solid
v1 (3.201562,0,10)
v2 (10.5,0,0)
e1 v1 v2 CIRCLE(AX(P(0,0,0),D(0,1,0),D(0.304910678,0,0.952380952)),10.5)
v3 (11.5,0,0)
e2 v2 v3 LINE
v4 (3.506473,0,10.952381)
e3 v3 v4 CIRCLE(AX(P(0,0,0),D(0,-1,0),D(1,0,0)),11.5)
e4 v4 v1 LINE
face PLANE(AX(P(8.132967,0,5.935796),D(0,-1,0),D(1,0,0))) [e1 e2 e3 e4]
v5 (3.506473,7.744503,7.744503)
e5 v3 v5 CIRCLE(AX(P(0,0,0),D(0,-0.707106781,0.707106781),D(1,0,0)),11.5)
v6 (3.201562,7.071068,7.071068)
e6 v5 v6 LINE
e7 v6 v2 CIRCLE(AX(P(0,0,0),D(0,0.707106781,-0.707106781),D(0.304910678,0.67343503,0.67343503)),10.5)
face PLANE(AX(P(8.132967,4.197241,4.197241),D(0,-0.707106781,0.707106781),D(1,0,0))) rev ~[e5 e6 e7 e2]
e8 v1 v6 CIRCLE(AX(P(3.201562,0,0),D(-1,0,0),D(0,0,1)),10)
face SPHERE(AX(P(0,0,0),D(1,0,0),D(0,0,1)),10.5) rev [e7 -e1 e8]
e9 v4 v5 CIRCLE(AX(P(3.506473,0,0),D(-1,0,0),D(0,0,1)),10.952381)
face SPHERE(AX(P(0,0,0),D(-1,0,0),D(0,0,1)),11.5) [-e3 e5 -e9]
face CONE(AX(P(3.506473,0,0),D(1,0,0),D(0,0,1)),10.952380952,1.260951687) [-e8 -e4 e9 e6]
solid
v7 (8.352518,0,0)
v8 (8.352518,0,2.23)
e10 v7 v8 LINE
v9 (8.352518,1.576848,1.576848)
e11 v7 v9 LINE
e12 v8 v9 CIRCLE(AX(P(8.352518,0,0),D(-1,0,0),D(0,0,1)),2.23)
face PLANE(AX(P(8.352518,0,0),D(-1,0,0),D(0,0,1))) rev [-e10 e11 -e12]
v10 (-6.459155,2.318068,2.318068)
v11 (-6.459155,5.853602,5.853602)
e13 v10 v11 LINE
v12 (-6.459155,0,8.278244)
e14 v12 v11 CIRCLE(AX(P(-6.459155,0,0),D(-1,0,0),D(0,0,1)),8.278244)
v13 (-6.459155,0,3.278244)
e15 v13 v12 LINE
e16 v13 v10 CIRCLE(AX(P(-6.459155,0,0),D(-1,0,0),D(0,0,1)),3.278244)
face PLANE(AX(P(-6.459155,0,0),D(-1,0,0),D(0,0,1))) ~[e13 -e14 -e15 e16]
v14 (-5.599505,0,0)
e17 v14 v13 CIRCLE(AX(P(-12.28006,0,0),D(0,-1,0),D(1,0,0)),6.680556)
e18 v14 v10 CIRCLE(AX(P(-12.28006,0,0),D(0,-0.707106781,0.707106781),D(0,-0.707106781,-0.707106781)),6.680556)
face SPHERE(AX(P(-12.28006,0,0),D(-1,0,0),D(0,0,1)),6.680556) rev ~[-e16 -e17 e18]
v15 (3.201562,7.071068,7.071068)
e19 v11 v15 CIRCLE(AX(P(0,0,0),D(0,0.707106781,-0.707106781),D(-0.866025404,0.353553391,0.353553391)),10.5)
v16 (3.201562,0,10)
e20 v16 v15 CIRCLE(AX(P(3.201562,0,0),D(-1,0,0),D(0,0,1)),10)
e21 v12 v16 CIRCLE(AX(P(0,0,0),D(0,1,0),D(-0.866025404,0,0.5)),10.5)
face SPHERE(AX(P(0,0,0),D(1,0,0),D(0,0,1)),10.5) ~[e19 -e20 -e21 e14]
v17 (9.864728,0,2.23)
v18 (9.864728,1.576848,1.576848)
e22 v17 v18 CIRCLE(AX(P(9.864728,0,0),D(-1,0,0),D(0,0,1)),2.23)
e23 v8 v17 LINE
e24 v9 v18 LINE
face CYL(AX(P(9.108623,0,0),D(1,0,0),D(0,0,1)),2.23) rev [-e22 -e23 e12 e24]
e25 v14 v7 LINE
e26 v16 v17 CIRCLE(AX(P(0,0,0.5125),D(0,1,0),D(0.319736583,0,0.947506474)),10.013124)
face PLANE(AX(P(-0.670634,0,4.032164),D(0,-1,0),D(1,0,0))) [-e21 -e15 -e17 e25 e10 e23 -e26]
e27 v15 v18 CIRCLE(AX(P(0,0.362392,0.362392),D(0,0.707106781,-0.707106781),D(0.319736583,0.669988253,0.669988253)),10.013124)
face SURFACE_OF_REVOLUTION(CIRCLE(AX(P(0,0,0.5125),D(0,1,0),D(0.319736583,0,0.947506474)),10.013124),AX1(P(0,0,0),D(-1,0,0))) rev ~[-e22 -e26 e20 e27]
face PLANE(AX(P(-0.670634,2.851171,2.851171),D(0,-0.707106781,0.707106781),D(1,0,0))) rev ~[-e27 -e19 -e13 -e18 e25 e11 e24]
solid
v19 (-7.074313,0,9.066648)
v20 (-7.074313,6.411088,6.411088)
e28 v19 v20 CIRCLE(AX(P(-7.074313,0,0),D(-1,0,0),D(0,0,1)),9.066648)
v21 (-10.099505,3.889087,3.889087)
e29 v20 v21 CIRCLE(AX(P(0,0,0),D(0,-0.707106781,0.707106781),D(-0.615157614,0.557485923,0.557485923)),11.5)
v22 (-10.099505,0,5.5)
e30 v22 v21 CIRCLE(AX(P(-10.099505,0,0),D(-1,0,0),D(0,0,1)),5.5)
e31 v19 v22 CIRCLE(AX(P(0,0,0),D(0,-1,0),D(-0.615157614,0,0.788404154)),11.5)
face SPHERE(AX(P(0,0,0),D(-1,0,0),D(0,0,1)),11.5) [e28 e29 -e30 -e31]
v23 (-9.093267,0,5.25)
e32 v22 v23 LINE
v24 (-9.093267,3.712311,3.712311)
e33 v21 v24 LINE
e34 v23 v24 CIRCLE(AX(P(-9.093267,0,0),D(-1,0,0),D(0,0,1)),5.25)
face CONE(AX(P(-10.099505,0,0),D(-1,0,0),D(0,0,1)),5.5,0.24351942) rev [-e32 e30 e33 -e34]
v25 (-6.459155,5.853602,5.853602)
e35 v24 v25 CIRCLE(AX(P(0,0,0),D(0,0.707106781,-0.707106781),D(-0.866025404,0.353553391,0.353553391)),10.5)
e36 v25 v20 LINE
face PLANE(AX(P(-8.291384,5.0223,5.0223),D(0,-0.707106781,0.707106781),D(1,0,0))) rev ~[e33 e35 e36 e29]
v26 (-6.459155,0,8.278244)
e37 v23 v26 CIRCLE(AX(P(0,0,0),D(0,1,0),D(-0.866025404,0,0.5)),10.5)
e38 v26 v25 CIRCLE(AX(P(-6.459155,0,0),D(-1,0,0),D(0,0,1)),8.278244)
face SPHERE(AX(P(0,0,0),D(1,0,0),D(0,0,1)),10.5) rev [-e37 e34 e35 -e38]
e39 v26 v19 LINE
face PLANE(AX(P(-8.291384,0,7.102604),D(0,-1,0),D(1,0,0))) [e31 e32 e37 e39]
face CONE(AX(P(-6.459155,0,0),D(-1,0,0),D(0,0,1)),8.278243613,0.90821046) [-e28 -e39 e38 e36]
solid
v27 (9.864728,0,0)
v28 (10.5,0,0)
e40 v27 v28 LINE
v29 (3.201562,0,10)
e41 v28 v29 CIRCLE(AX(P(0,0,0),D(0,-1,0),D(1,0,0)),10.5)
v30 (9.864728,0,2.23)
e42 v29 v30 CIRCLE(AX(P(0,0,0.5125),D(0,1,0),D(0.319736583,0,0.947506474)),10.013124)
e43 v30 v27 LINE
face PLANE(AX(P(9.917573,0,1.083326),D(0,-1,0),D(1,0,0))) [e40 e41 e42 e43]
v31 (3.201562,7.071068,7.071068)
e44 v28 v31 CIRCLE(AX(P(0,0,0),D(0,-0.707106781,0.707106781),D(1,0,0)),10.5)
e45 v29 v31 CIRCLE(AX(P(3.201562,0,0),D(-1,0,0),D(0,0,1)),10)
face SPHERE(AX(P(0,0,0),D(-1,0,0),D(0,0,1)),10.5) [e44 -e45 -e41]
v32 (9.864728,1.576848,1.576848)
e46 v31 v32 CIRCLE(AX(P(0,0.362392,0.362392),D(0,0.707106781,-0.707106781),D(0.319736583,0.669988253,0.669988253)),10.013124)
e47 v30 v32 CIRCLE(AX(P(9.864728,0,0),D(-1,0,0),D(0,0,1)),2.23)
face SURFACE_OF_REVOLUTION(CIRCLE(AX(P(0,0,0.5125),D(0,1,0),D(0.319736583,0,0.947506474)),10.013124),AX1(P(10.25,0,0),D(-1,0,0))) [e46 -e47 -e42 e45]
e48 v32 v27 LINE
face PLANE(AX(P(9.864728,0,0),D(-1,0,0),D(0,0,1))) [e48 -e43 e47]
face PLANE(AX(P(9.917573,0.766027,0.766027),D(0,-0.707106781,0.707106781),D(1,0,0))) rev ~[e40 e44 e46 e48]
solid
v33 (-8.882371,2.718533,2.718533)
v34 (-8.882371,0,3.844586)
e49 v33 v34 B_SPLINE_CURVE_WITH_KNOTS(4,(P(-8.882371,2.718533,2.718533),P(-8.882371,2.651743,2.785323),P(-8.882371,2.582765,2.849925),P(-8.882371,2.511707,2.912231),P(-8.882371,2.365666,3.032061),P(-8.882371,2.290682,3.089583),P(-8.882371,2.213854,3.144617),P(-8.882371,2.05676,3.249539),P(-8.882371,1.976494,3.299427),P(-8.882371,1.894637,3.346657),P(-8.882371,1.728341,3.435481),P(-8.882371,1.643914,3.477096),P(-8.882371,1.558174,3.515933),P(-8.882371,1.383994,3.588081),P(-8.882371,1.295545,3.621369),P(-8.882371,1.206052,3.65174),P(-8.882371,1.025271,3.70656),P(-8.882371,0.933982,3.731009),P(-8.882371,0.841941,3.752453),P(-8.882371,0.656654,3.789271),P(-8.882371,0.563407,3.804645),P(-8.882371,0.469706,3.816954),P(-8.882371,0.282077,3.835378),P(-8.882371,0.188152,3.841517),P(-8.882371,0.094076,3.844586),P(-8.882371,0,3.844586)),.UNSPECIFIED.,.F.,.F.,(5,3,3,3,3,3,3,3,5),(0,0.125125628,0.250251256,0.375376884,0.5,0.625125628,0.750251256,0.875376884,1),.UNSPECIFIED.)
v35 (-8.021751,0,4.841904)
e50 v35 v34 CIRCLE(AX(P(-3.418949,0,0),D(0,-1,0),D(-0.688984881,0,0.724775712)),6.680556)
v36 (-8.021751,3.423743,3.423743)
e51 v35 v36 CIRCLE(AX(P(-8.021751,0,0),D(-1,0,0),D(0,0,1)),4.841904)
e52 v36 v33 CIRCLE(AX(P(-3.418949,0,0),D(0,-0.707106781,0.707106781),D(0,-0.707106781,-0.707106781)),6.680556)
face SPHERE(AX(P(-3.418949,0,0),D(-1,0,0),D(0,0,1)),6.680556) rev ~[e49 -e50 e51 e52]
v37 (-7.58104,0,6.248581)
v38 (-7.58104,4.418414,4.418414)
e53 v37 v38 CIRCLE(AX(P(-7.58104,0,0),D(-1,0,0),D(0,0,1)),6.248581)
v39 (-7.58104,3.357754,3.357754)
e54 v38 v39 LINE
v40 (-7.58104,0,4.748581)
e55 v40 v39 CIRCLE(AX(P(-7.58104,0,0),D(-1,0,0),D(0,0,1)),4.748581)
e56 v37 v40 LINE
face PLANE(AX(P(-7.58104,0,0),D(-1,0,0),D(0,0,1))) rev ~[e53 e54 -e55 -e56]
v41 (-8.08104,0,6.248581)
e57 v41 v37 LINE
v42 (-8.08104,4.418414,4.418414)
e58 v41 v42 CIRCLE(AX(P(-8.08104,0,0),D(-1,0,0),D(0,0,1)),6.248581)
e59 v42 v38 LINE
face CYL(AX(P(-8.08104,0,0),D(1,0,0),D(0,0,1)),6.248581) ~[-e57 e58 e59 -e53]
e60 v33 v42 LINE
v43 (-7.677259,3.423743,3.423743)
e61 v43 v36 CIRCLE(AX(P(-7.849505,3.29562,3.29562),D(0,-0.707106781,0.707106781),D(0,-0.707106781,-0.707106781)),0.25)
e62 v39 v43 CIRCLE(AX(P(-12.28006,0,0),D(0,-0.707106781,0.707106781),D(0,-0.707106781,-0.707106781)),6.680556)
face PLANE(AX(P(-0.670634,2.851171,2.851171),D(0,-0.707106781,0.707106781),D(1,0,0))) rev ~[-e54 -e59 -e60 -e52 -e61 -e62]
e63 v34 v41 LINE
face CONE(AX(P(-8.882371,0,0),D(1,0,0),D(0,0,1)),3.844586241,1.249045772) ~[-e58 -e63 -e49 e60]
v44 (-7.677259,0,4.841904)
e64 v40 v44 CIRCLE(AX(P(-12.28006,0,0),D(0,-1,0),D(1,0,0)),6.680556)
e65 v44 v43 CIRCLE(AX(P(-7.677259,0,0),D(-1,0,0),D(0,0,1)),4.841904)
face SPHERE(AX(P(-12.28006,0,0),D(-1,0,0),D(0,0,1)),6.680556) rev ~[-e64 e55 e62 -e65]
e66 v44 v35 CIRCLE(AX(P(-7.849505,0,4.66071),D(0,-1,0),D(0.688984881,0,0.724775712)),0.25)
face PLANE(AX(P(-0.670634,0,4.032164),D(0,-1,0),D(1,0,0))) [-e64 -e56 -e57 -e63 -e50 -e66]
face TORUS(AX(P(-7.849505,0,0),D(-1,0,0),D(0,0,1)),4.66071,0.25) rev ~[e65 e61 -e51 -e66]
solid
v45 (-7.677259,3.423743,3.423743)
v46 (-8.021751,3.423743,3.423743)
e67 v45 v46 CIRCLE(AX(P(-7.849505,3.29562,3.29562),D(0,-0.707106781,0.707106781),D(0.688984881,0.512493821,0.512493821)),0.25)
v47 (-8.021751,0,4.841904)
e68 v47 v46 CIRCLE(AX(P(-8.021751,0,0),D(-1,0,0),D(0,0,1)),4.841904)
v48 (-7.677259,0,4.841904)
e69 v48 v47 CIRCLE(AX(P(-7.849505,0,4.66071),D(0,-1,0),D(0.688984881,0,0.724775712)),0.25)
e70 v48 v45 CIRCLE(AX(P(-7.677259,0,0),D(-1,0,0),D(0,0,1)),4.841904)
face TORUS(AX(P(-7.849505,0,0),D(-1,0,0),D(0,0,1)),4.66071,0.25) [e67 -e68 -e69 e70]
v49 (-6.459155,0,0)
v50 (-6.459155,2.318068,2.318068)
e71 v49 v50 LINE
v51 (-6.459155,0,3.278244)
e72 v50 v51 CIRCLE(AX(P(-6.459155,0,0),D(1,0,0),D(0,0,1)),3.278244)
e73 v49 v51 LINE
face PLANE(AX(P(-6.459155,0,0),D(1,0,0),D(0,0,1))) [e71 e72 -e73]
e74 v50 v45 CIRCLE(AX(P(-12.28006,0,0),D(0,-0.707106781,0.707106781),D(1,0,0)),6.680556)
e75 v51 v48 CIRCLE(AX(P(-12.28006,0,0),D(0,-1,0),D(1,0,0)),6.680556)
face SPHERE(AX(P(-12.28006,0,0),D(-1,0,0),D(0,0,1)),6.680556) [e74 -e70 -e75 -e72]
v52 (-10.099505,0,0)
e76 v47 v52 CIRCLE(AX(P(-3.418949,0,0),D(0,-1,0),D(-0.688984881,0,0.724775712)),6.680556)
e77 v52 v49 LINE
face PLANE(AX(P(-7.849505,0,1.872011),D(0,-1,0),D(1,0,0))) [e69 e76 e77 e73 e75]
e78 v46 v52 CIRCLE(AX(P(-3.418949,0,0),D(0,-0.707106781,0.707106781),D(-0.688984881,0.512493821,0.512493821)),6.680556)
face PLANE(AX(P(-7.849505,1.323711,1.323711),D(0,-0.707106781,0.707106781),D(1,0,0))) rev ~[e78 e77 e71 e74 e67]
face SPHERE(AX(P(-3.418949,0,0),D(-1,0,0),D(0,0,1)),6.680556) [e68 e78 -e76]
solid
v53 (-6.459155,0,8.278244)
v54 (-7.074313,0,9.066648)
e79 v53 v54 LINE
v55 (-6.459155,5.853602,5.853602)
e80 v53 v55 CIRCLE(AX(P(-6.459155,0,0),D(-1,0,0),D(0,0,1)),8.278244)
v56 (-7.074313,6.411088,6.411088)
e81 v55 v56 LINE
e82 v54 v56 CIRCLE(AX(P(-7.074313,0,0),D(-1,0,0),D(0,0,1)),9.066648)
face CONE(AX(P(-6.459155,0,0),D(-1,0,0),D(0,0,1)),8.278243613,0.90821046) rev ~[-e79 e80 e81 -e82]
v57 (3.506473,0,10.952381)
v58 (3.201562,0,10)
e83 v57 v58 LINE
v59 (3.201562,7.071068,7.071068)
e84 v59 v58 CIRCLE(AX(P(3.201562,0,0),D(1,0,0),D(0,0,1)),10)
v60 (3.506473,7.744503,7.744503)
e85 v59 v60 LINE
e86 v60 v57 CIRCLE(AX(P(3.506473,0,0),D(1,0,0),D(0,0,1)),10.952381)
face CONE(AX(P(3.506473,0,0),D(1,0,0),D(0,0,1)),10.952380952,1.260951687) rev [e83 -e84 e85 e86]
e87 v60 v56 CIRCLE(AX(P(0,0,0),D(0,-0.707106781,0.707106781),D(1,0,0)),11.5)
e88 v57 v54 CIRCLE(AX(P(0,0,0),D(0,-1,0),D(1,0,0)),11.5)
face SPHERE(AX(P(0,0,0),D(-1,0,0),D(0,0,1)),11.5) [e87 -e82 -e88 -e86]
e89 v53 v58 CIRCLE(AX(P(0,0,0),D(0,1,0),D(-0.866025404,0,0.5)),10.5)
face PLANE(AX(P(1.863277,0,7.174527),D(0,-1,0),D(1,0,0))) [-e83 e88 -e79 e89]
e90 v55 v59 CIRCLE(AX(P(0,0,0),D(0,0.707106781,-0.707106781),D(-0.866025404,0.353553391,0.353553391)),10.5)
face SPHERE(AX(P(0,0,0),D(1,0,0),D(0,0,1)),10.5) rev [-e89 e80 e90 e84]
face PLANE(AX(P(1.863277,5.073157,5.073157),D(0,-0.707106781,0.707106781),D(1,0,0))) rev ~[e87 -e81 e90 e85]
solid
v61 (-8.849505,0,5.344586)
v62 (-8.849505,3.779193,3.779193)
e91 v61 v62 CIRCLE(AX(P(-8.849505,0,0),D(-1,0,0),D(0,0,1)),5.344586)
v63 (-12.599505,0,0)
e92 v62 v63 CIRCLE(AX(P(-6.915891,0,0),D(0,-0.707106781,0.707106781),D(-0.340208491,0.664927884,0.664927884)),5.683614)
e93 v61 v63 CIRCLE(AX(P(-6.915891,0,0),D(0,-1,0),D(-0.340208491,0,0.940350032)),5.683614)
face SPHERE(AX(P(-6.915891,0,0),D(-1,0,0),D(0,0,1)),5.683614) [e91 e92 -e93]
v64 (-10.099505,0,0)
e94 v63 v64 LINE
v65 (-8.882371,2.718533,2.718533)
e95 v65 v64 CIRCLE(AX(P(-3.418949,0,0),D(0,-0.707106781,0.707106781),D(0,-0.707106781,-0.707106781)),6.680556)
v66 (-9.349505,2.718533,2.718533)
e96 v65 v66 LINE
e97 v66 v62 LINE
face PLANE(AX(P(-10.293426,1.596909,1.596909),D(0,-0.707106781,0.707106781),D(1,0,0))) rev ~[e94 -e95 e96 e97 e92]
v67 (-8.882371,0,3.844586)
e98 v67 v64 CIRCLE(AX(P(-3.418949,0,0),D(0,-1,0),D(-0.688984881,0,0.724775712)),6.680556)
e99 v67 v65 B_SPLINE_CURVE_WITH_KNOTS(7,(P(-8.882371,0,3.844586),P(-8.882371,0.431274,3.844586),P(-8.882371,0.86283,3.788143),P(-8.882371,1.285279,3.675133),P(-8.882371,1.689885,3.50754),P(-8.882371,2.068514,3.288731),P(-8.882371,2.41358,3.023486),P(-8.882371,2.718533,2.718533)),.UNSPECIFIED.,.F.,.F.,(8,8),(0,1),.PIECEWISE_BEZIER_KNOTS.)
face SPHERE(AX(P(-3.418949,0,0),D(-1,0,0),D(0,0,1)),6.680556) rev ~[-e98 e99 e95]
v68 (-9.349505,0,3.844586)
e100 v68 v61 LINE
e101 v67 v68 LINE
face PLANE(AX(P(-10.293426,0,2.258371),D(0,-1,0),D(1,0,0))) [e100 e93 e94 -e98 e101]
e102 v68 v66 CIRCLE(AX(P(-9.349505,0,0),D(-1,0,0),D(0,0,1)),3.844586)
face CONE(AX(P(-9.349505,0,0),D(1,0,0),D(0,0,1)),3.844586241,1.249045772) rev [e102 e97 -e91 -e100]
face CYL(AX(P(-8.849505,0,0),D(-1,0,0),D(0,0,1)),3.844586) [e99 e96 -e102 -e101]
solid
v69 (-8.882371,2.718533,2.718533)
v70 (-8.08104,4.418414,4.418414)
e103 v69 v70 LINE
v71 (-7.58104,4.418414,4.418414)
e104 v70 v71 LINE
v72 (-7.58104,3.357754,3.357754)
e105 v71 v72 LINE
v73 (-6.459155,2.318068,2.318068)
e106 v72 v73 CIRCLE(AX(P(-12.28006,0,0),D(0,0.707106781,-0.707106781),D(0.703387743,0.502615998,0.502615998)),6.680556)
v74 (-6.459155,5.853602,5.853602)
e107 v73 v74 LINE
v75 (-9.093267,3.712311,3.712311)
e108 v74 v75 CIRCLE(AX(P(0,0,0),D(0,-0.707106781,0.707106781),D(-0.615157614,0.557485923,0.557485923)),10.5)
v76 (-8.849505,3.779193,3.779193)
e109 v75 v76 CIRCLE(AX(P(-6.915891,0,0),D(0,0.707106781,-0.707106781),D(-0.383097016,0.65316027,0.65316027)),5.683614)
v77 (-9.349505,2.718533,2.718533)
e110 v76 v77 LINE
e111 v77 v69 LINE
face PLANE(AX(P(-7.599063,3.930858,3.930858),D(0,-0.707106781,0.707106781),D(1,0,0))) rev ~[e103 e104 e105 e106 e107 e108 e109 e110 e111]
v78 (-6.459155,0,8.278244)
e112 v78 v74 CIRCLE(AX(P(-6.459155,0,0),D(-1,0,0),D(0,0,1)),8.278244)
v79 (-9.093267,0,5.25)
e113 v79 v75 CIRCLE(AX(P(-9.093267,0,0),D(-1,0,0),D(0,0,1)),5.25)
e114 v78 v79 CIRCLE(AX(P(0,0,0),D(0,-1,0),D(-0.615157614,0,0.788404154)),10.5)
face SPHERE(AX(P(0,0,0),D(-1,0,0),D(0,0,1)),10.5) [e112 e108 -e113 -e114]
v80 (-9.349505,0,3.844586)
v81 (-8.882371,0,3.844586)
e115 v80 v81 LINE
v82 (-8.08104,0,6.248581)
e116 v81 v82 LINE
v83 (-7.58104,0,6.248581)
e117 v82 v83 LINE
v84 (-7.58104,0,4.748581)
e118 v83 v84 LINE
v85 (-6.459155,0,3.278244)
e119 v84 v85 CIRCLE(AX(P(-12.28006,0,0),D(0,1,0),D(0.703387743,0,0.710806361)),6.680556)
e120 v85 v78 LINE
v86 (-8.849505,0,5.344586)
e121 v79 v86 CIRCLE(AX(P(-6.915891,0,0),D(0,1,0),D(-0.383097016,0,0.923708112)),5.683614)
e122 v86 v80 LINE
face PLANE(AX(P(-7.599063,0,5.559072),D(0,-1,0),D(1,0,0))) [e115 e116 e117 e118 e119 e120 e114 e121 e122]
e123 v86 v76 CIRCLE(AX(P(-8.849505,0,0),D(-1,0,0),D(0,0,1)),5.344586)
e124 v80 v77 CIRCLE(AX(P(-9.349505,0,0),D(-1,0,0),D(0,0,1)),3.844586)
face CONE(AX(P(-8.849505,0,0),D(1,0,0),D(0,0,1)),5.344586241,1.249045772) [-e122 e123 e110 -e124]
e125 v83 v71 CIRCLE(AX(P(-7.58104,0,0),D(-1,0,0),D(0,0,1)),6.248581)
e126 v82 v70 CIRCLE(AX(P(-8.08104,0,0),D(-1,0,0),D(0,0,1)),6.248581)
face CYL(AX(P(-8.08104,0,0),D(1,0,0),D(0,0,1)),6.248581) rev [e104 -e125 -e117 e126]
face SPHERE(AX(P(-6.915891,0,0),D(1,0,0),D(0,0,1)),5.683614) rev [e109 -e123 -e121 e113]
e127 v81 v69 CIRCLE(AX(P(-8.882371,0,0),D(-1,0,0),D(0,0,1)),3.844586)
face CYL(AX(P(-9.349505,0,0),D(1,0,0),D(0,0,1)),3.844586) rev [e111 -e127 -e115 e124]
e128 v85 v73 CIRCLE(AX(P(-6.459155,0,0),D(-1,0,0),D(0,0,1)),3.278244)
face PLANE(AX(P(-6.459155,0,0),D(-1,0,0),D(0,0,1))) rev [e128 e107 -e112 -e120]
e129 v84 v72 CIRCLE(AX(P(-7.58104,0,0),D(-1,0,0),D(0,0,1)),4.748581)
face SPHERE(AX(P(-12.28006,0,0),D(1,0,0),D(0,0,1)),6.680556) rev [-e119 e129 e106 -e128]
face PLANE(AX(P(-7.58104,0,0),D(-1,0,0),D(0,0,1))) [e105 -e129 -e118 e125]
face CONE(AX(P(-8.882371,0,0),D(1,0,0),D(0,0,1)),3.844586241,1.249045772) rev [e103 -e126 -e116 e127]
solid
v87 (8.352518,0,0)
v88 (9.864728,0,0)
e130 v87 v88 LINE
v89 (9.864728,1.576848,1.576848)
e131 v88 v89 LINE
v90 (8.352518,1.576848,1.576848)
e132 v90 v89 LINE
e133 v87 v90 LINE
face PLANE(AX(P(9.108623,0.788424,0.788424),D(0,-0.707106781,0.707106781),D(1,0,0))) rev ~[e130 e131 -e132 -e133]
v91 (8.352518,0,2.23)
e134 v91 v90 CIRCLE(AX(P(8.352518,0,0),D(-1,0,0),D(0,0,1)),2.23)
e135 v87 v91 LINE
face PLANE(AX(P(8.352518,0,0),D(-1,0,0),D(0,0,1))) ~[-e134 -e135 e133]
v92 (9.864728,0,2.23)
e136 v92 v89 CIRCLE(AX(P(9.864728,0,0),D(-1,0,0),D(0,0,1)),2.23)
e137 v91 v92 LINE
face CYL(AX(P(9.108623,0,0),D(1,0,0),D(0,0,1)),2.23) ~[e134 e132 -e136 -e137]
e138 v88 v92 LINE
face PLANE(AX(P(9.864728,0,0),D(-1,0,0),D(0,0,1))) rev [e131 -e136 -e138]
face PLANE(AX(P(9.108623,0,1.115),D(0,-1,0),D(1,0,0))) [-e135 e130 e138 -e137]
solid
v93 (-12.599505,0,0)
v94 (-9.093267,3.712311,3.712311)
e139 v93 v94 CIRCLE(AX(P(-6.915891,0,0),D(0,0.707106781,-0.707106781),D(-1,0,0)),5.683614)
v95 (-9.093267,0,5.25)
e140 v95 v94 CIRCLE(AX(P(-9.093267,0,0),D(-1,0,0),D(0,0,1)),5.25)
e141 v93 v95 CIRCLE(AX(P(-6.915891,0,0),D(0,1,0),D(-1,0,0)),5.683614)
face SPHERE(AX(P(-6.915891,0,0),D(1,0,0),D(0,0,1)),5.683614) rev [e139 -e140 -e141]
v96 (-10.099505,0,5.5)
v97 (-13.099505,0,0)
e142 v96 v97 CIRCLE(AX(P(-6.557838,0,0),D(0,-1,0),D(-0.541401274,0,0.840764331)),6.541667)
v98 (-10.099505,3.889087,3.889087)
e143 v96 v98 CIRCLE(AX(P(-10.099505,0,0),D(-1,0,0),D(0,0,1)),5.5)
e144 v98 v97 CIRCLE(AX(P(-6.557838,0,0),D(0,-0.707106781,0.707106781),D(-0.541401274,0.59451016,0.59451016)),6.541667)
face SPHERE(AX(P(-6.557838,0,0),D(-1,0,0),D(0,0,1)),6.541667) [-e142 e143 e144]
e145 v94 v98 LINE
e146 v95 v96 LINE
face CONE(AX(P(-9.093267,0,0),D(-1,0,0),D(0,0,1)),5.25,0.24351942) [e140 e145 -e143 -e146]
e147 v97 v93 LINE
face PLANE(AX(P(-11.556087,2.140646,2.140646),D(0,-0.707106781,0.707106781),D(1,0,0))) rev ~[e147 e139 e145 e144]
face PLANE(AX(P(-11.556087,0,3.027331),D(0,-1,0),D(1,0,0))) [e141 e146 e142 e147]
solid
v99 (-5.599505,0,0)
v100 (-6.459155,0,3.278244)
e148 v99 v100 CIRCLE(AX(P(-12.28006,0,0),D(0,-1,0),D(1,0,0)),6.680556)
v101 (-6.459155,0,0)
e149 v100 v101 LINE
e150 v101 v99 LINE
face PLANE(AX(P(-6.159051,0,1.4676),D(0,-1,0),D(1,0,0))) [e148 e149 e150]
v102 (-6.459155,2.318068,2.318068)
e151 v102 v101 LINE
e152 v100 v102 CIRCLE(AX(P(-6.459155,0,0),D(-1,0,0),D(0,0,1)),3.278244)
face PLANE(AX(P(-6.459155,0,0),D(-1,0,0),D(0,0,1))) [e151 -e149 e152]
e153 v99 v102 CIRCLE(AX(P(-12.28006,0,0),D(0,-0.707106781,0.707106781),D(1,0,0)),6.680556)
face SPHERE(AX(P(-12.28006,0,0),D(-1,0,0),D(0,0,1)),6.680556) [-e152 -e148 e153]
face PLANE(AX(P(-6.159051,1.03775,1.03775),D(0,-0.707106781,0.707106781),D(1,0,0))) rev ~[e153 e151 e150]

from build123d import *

# Parameters (mm, degrees)
F1_ANGLE  = 45
F3_ANGLE  = 45
F4_ANGLE  = 45
F6_ANGLE  = 45
F7_ANGLE  = 45
F9_ANGLE  = 45
F10_ANGLE = 45
F11_W     = 1.51221
F11_H     = 2.23
F12_ANGLE = 45
F13_ANGLE = 45
F15_ANGLE = 45
F16_ANGLE = 45
F19_ANGLE = 45
F22_ANGLE = 45
F25_ANGLE = 45
F28_ANGLE = 45
F31_ANGLE = 45
F34_ANGLE = 45


with BuildPart() as f1:
    # F0 (on Front) → F1 (revolve)
    with BuildSketch(Plane.XZ):
        with BuildLine():
            Line((-11.5, 0), (11.5, 0))
            ThreePointArc((11.5, 0), (2.8377537956, 11.1443776585), (-10.0995049384, 5.5))
            ThreePointArc((-10.0995049384, 5.5), (-12.3007384778, 3.1324910215), (-13.0995049384, 0))
            Line((-13.0995049384, 0), (-11.5, 0))
        make_face()
    revolve(axis=Axis((0, 0, 0), (-1, 0, 0)), revolution_arc=F1_ANGLE)

    # F2 (on Front) → F3 (revolve, cut)
    with BuildSketch(Plane.XZ):
        with BuildLine():
            ThreePointArc((11.5, 0), (2.8377537956, 11.1443776585), (-10.0995049384, 5.5))
            Line((-10.0995049384, 5.5), (-9.0932667397, 5.25))
            ThreePointArc((-9.0932667397, 5.25), (2.7175999736, 10.142221176), (10.5, 0))
            Line((10.5, 0), (11.5, 0))
        make_face()
    revolve(axis=Axis((0, 0, 0), (-1, 0, 0)), revolution_arc=F3_ANGLE, mode=Mode.SUBTRACT)

    # F5 (on face) → F6 (revolve, cut)
    with BuildSketch(Plane.XZ):
        with BuildLine():
            ThreePointArc((-12.5995049384, 0), (-11.6423500551, 3.1565885979), (-9.0932667397, 5.25))
            Line((-9.0932667397, 5.25), (-10.0995049384, 5.5))
            ThreePointArc((-10.0995049384, 5.5), (-12.3007384778, 3.1324910215), (-13.0995049384, 0))
            Line((-13.0995049384, 0), (-12.5995049384, 0))
        make_face()
    revolve(axis=Axis((-12.2997524692, 0, 0), (-1, 0, 0)), revolution_arc=F6_ANGLE, mode=Mode.SUBTRACT)

    # F8 (on Front) → F9 (revolve, cut)
    with BuildSketch(Plane.XZ):
        with BuildLine():
            ThreePointArc((3.2015621187, 10), (8.2807192075, 6.1420955145), (10, 0))
            Line((10, 0), (10.5, 0))
            ThreePointArc((10.5, 0), (8.4813442993, 6.1900564518), (3.2015621187, 10))
        make_face()
    revolve(axis=Axis((0, 0, 0), (-1, 0, 0)), revolution_arc=F9_ANGLE, mode=Mode.SUBTRACT)

    # F11 (on face) → F12 (revolve, cut)
    with BuildSketch(Plane.XZ):
        with Locations((9.1086225685, 1.115)):
            Rectangle(F11_W, F11_H)
    revolve(axis=Axis((9.1086225685, 0, 0), (-1, 0, 0)), revolution_arc=F12_ANGLE, mode=Mode.SUBTRACT)

    # F14 (on Front) → F15 (revolve, cut)
    with BuildSketch(Plane.XZ):
        with BuildLine():
            ThreePointArc((10, 0), (9.9947523902, 1.1187845105), (9.8647275685, 2.23))
            Line((9.8647275685, 2.23), (9.8647275685, 0))
            Line((9.8647275685, 0), (10, 0))
        make_face()
    revolve(axis=Axis((9.9323637842, 0, 0), (-1, 0, 0)), revolution_arc=F15_ANGLE, mode=Mode.SUBTRACT)

    # F20 (on Front) → F21 (revolve, cut)
    with BuildSketch(Plane.XZ):
        with BuildLine():
            Line((-9.3495049384, 3.8445862413), (-8.8495049384, 5.3445862413))
            ThreePointArc((-8.8495049384, 5.3445862413), (-11.5684914777, 3.2644717065), (-12.5995049384, 0))
            Line((-12.5995049384, 0), (-8.8495049384, 0))
            Line((-8.8495049384, 0), (-8.8495049384, 3.8445862413))
            Line((-8.8495049384, 3.8445862413), (-9.3495049384, 3.8445862413))
        make_face()
    revolve(axis=Axis((-10.7245049384, 0, 0), (1, 0, 0)), mode=Mode.SUBTRACT)


with BuildPart() as f4:
    # F2 (on Front) → F4 (revolve)
    with BuildSketch(Plane.XZ):
        with BuildLine():
            ThreePointArc((11.5, 0), (2.8377537956, 11.1443776585), (-10.0995049384, 5.5))
            Line((-10.0995049384, 5.5), (-9.0932667397, 5.25))
            ThreePointArc((-9.0932667397, 5.25), (2.7175999736, 10.142221176), (10.5, 0))
            Line((10.5, 0), (11.5, 0))
        make_face()
    revolve(axis=Axis((0, 0, 0), (-1, 0, 0)), revolution_arc=F4_ANGLE)

    # F17 (on Front) → F18 (revolve, cut)
    with BuildSketch(Plane.XZ):
        with BuildLine():
            ThreePointArc((11.5, 0), (9.2890913754, 6.7795856377), (3.5064727967, 10.9523809524))
            Line((3.5064727967, 10.9523809524), (3.2015621187, 10))
            ThreePointArc((3.2015621187, 10), (8.4813442993, 6.1900564518), (10.5, 0))
            Line((10.5, 0), (11.5, 0))
        make_face()
    revolve(axis=Axis((11, 0, 0), (1, 0, 0)), mode=Mode.SUBTRACT)

    # F29 (on Front) → F30 (revolve, cut)
    with BuildSketch(Plane.XZ):
        with BuildLine():
            ThreePointArc((-9.0932667397, 5.25), (-7.9222484154, 6.8911523017), (-6.4591549508, 8.2782436134))
            Line((-6.4591549508, 8.2782436134), (-7.0743125651, 9.066647767))
            ThreePointArc((-7.0743125651, 9.066647767), (-8.7701337495, 7.438733361), (-10.0995049384, 5.5))
            Line((-10.0995049384, 5.5), (-9.0932667397, 5.25))
        make_face()
    revolve(axis=Axis((-7.8495049384, 0, 0), (-1, 0, 0)), mode=Mode.SUBTRACT)


with BuildPart() as f7:
    # F5 (on face) → F7 (revolve)
    with BuildSketch(Plane.XZ):
        with BuildLine():
            ThreePointArc((-12.5995049384, 0), (-11.6423500551, 3.1565885979), (-9.0932667397, 5.25))
            Line((-9.0932667397, 5.25), (-10.0995049384, 5.5))
            ThreePointArc((-10.0995049384, 5.5), (-12.3007384778, 3.1324910215), (-13.0995049384, 0))
            Line((-13.0995049384, 0), (-12.5995049384, 0))
        make_face()
    revolve(axis=Axis((0, 0, 0), (-1, 0, 0)), revolution_arc=F7_ANGLE)


with BuildPart() as f10:
    # F8 (on Front) → F10 (revolve)
    with BuildSketch(Plane.XZ):
        with BuildLine():
            ThreePointArc((3.2015621187, 10), (8.2807192075, 6.1420955145), (10, 0))
            Line((10, 0), (10.5, 0))
            ThreePointArc((10.5, 0), (8.4813442993, 6.1900564518), (3.2015621187, 10))
        make_face()
    revolve(axis=Axis((10.25, 0, 0), (-1, 0, 0)), revolution_arc=F10_ANGLE)

    # F14 (on Front) → F16 (revolve)
    with BuildSketch(Plane.XZ):
        with BuildLine():
            ThreePointArc((10, 0), (9.9947523902, 1.1187845105), (9.8647275685, 2.23))
            Line((9.8647275685, 2.23), (9.8647275685, 0))
            Line((9.8647275685, 0), (10, 0))
        make_face()
    revolve(axis=Axis((0, 0, 0), (-1, 0, 0)), revolution_arc=F16_ANGLE)


with BuildPart() as f13:
    # F11 (on face) → F13 (revolve)
    with BuildSketch(Plane.XZ):
        with Locations((9.1086225685, 1.115)):
            Rectangle(F11_W, F11_H)
    revolve(axis=Axis((0, 0, 0), (-1, 0, 0)), revolution_arc=F13_ANGLE)


with BuildPart() as f19:
    # F17 (on Front) → F19 (revolve)
    with BuildSketch(Plane.XZ):
        with BuildLine():
            ThreePointArc((11.5, 0), (9.2890913754, 6.7795856377), (3.5064727967, 10.9523809524))
            Line((3.5064727967, 10.9523809524), (3.2015621187, 10))
            ThreePointArc((3.2015621187, 10), (8.4813442993, 6.1900564518), (10.5, 0))
            Line((10.5, 0), (11.5, 0))
        make_face()
    revolve(axis=Axis((0, 0, 0), (-1, 0, 0)), revolution_arc=F19_ANGLE)


with BuildPart() as f22:
    # F20 (on Front) → F22 (revolve)
    with BuildSketch(Plane.XZ):
        with BuildLine():
            Line((-9.3495049384, 3.8445862413), (-8.8495049384, 5.3445862413))
            ThreePointArc((-8.8495049384, 5.3445862413), (-11.5684914777, 3.2644717065), (-12.5995049384, 0))
            Line((-12.5995049384, 0), (-8.8495049384, 0))
            Line((-8.8495049384, 0), (-8.8495049384, 3.8445862413))
            Line((-8.8495049384, 3.8445862413), (-9.3495049384, 3.8445862413))
        make_face()
    revolve(axis=Axis((0, 0, 0), (-1, 0, 0)), revolution_arc=F22_ANGLE)


with BuildPart() as f24_tool:
    # F23 (on Front) → F24 (revolve)
    with BuildSketch(Plane.XZ):
        with BuildLine():
            Line((-10.0995049384, 0), (-5.5995049384, 0))
            ThreePointArc((-5.5995049384, 0), (-6.1408791354, 2.6344401261), (-7.6772587181, 4.8419044128))
            ThreePointArc((-7.6772587181, 4.8419044128), (-7.8495049384, 4.9107104847), (-8.0217511587, 4.8419044128))
            ThreePointArc((-8.0217511587, 4.8419044128), (-9.5581307413, 2.6344401261), (-10.0995049384, 0))
        make_face()
    revolve(axis=Axis((0, 0, 0), (-1, 0, 0)))


with BuildPart() as f1_1:
    add(f1.part)

    # F24: cut by f24_tool
    add(f24_tool.part, mode=Mode.SUBTRACT)

    # F26 (on Front) → F27 (revolve, cut)
    with BuildSketch(Plane.XZ):
        with BuildLine():
            Line((-8.8495049384, 5.3445862413), (-9.3495049384, 3.8445862413))
            Line((-9.3495049384, 3.8445862413), (-8.8823713109, 3.8445862413))
            Line((-8.8823713109, 3.8445862413), (-8.0810395972, 6.2485813822))
            Line((-8.0810395972, 6.2485813822), (-7.5810395972, 6.2485813822))
            Line((-7.5810395972, 6.2485813822), (-7.5810395972, 4.7485813822))
            ThreePointArc((-7.5810395972, 4.7485813822), (-6.9689696113, 4.0524234931), (-6.4591549508, 3.2782436134))
            Line((-6.4591549508, 3.2782436134), (-6.4591549508, 8.2782436134))
            ThreePointArc((-6.4591549508, 8.2782436134), (-7.9222484154, 6.8911523017), (-9.0932667397, 5.25))
            ThreePointArc((-9.0932667397, 5.25), (-8.9719298306, 5.298695062), (-8.8495049384, 5.3445862413))
        make_face()
    revolve(axis=Axis((-7.8495049384, 0, 0), (-1, 0, 0)), mode=Mode.SUBTRACT)


with BuildPart() as f22_1:
    add(f22.part)

    # F24: cut by f24_tool
    add(f24_tool.part, mode=Mode.SUBTRACT)


with BuildPart() as f25:
    # F23 (on Front) → F25 (revolve)
    with BuildSketch(Plane.XZ):
        with BuildLine():
            Line((-10.0995049384, 0), (-5.5995049384, 0))
            ThreePointArc((-5.5995049384, 0), (-6.1408791354, 2.6344401261), (-7.6772587181, 4.8419044128))
            ThreePointArc((-7.6772587181, 4.8419044128), (-7.8495049384, 4.9107104847), (-8.0217511587, 4.8419044128))
            ThreePointArc((-8.0217511587, 4.8419044128), (-9.5581307413, 2.6344401261), (-10.0995049384, 0))
        make_face()
    revolve(axis=Axis((0, 0, 0), (-1, 0, 0)), revolution_arc=F25_ANGLE)

    # F32 (on Front) → F33 (revolve, cut)
    with BuildSketch(Plane.XZ):
        with BuildLine():
            Line((-6.4591549508, 3.2782436134), (-6.4591549508, 0))
            Line((-6.4591549508, 0), (-5.5995049384, 0))
            ThreePointArc((-5.5995049384, 0), (-5.8179901834, 1.6945411866), (-6.4591549508, 3.2782436134))
        make_face()
    revolve(axis=Axis((-6.0293299446, 0, 0), (1, 0, 0)), mode=Mode.SUBTRACT)


with BuildPart() as f28:
    # F26 (on Front) → F28 (revolve)
    with BuildSketch(Plane.XZ):
        with BuildLine():
            Line((-8.8495049384, 5.3445862413), (-9.3495049384, 3.8445862413))
            Line((-9.3495049384, 3.8445862413), (-8.8823713109, 3.8445862413))
            Line((-8.8823713109, 3.8445862413), (-8.0810395972, 6.2485813822))
            Line((-8.0810395972, 6.2485813822), (-7.5810395972, 6.2485813822))
            Line((-7.5810395972, 6.2485813822), (-7.5810395972, 4.7485813822))
            ThreePointArc((-7.5810395972, 4.7485813822), (-6.9689696113, 4.0524234931), (-6.4591549508, 3.2782436134))
            Line((-6.4591549508, 3.2782436134), (-6.4591549508, 8.2782436134))
            ThreePointArc((-6.4591549508, 8.2782436134), (-7.9222484154, 6.8911523017), (-9.0932667397, 5.25))
            ThreePointArc((-9.0932667397, 5.25), (-8.9719298306, 5.298695062), (-8.8495049384, 5.3445862413))
        make_face()
    revolve(axis=Axis((-7.8495049384, 0, 0), (-1, 0, 0)), revolution_arc=F28_ANGLE)


with BuildPart() as f31:
    # F29 (on Front) → F31 (revolve)
    with BuildSketch(Plane.XZ):
        with BuildLine():
            ThreePointArc((-9.0932667397, 5.25), (-7.9222484154, 6.8911523017), (-6.4591549508, 8.2782436134))
            Line((-6.4591549508, 8.2782436134), (-7.0743125651, 9.066647767))
            ThreePointArc((-7.0743125651, 9.066647767), (-8.7701337495, 7.438733361), (-10.0995049384, 5.5))
            Line((-10.0995049384, 5.5), (-9.0932667397, 5.25))
        make_face()
    revolve(axis=Axis((-7.8495049384, 0, 0), (-1, 0, 0)), revolution_arc=F31_ANGLE)


with BuildPart() as f34:
    # F32 (on Front) → F34 (revolve)
    with BuildSketch(Plane.XZ):
        with BuildLine():
            Line((-6.4591549508, 3.2782436134), (-6.4591549508, 0))
            Line((-6.4591549508, 0), (-5.5995049384, 0))
            ThreePointArc((-5.5995049384, 0), (-5.8179901834, 1.6945411866), (-6.4591549508, 3.2782436134))
        make_face()
    revolve(axis=Axis((-7.8495049384, 0, 0), (-1, 0, 0)), revolution_arc=F34_ANGLE)


solid = Compound([f4.part, f7.part, f10.part, f13.part, f19.part, f1_1.part, f22_1.part, f25.part, f28.part, f31.part, f34.part])
